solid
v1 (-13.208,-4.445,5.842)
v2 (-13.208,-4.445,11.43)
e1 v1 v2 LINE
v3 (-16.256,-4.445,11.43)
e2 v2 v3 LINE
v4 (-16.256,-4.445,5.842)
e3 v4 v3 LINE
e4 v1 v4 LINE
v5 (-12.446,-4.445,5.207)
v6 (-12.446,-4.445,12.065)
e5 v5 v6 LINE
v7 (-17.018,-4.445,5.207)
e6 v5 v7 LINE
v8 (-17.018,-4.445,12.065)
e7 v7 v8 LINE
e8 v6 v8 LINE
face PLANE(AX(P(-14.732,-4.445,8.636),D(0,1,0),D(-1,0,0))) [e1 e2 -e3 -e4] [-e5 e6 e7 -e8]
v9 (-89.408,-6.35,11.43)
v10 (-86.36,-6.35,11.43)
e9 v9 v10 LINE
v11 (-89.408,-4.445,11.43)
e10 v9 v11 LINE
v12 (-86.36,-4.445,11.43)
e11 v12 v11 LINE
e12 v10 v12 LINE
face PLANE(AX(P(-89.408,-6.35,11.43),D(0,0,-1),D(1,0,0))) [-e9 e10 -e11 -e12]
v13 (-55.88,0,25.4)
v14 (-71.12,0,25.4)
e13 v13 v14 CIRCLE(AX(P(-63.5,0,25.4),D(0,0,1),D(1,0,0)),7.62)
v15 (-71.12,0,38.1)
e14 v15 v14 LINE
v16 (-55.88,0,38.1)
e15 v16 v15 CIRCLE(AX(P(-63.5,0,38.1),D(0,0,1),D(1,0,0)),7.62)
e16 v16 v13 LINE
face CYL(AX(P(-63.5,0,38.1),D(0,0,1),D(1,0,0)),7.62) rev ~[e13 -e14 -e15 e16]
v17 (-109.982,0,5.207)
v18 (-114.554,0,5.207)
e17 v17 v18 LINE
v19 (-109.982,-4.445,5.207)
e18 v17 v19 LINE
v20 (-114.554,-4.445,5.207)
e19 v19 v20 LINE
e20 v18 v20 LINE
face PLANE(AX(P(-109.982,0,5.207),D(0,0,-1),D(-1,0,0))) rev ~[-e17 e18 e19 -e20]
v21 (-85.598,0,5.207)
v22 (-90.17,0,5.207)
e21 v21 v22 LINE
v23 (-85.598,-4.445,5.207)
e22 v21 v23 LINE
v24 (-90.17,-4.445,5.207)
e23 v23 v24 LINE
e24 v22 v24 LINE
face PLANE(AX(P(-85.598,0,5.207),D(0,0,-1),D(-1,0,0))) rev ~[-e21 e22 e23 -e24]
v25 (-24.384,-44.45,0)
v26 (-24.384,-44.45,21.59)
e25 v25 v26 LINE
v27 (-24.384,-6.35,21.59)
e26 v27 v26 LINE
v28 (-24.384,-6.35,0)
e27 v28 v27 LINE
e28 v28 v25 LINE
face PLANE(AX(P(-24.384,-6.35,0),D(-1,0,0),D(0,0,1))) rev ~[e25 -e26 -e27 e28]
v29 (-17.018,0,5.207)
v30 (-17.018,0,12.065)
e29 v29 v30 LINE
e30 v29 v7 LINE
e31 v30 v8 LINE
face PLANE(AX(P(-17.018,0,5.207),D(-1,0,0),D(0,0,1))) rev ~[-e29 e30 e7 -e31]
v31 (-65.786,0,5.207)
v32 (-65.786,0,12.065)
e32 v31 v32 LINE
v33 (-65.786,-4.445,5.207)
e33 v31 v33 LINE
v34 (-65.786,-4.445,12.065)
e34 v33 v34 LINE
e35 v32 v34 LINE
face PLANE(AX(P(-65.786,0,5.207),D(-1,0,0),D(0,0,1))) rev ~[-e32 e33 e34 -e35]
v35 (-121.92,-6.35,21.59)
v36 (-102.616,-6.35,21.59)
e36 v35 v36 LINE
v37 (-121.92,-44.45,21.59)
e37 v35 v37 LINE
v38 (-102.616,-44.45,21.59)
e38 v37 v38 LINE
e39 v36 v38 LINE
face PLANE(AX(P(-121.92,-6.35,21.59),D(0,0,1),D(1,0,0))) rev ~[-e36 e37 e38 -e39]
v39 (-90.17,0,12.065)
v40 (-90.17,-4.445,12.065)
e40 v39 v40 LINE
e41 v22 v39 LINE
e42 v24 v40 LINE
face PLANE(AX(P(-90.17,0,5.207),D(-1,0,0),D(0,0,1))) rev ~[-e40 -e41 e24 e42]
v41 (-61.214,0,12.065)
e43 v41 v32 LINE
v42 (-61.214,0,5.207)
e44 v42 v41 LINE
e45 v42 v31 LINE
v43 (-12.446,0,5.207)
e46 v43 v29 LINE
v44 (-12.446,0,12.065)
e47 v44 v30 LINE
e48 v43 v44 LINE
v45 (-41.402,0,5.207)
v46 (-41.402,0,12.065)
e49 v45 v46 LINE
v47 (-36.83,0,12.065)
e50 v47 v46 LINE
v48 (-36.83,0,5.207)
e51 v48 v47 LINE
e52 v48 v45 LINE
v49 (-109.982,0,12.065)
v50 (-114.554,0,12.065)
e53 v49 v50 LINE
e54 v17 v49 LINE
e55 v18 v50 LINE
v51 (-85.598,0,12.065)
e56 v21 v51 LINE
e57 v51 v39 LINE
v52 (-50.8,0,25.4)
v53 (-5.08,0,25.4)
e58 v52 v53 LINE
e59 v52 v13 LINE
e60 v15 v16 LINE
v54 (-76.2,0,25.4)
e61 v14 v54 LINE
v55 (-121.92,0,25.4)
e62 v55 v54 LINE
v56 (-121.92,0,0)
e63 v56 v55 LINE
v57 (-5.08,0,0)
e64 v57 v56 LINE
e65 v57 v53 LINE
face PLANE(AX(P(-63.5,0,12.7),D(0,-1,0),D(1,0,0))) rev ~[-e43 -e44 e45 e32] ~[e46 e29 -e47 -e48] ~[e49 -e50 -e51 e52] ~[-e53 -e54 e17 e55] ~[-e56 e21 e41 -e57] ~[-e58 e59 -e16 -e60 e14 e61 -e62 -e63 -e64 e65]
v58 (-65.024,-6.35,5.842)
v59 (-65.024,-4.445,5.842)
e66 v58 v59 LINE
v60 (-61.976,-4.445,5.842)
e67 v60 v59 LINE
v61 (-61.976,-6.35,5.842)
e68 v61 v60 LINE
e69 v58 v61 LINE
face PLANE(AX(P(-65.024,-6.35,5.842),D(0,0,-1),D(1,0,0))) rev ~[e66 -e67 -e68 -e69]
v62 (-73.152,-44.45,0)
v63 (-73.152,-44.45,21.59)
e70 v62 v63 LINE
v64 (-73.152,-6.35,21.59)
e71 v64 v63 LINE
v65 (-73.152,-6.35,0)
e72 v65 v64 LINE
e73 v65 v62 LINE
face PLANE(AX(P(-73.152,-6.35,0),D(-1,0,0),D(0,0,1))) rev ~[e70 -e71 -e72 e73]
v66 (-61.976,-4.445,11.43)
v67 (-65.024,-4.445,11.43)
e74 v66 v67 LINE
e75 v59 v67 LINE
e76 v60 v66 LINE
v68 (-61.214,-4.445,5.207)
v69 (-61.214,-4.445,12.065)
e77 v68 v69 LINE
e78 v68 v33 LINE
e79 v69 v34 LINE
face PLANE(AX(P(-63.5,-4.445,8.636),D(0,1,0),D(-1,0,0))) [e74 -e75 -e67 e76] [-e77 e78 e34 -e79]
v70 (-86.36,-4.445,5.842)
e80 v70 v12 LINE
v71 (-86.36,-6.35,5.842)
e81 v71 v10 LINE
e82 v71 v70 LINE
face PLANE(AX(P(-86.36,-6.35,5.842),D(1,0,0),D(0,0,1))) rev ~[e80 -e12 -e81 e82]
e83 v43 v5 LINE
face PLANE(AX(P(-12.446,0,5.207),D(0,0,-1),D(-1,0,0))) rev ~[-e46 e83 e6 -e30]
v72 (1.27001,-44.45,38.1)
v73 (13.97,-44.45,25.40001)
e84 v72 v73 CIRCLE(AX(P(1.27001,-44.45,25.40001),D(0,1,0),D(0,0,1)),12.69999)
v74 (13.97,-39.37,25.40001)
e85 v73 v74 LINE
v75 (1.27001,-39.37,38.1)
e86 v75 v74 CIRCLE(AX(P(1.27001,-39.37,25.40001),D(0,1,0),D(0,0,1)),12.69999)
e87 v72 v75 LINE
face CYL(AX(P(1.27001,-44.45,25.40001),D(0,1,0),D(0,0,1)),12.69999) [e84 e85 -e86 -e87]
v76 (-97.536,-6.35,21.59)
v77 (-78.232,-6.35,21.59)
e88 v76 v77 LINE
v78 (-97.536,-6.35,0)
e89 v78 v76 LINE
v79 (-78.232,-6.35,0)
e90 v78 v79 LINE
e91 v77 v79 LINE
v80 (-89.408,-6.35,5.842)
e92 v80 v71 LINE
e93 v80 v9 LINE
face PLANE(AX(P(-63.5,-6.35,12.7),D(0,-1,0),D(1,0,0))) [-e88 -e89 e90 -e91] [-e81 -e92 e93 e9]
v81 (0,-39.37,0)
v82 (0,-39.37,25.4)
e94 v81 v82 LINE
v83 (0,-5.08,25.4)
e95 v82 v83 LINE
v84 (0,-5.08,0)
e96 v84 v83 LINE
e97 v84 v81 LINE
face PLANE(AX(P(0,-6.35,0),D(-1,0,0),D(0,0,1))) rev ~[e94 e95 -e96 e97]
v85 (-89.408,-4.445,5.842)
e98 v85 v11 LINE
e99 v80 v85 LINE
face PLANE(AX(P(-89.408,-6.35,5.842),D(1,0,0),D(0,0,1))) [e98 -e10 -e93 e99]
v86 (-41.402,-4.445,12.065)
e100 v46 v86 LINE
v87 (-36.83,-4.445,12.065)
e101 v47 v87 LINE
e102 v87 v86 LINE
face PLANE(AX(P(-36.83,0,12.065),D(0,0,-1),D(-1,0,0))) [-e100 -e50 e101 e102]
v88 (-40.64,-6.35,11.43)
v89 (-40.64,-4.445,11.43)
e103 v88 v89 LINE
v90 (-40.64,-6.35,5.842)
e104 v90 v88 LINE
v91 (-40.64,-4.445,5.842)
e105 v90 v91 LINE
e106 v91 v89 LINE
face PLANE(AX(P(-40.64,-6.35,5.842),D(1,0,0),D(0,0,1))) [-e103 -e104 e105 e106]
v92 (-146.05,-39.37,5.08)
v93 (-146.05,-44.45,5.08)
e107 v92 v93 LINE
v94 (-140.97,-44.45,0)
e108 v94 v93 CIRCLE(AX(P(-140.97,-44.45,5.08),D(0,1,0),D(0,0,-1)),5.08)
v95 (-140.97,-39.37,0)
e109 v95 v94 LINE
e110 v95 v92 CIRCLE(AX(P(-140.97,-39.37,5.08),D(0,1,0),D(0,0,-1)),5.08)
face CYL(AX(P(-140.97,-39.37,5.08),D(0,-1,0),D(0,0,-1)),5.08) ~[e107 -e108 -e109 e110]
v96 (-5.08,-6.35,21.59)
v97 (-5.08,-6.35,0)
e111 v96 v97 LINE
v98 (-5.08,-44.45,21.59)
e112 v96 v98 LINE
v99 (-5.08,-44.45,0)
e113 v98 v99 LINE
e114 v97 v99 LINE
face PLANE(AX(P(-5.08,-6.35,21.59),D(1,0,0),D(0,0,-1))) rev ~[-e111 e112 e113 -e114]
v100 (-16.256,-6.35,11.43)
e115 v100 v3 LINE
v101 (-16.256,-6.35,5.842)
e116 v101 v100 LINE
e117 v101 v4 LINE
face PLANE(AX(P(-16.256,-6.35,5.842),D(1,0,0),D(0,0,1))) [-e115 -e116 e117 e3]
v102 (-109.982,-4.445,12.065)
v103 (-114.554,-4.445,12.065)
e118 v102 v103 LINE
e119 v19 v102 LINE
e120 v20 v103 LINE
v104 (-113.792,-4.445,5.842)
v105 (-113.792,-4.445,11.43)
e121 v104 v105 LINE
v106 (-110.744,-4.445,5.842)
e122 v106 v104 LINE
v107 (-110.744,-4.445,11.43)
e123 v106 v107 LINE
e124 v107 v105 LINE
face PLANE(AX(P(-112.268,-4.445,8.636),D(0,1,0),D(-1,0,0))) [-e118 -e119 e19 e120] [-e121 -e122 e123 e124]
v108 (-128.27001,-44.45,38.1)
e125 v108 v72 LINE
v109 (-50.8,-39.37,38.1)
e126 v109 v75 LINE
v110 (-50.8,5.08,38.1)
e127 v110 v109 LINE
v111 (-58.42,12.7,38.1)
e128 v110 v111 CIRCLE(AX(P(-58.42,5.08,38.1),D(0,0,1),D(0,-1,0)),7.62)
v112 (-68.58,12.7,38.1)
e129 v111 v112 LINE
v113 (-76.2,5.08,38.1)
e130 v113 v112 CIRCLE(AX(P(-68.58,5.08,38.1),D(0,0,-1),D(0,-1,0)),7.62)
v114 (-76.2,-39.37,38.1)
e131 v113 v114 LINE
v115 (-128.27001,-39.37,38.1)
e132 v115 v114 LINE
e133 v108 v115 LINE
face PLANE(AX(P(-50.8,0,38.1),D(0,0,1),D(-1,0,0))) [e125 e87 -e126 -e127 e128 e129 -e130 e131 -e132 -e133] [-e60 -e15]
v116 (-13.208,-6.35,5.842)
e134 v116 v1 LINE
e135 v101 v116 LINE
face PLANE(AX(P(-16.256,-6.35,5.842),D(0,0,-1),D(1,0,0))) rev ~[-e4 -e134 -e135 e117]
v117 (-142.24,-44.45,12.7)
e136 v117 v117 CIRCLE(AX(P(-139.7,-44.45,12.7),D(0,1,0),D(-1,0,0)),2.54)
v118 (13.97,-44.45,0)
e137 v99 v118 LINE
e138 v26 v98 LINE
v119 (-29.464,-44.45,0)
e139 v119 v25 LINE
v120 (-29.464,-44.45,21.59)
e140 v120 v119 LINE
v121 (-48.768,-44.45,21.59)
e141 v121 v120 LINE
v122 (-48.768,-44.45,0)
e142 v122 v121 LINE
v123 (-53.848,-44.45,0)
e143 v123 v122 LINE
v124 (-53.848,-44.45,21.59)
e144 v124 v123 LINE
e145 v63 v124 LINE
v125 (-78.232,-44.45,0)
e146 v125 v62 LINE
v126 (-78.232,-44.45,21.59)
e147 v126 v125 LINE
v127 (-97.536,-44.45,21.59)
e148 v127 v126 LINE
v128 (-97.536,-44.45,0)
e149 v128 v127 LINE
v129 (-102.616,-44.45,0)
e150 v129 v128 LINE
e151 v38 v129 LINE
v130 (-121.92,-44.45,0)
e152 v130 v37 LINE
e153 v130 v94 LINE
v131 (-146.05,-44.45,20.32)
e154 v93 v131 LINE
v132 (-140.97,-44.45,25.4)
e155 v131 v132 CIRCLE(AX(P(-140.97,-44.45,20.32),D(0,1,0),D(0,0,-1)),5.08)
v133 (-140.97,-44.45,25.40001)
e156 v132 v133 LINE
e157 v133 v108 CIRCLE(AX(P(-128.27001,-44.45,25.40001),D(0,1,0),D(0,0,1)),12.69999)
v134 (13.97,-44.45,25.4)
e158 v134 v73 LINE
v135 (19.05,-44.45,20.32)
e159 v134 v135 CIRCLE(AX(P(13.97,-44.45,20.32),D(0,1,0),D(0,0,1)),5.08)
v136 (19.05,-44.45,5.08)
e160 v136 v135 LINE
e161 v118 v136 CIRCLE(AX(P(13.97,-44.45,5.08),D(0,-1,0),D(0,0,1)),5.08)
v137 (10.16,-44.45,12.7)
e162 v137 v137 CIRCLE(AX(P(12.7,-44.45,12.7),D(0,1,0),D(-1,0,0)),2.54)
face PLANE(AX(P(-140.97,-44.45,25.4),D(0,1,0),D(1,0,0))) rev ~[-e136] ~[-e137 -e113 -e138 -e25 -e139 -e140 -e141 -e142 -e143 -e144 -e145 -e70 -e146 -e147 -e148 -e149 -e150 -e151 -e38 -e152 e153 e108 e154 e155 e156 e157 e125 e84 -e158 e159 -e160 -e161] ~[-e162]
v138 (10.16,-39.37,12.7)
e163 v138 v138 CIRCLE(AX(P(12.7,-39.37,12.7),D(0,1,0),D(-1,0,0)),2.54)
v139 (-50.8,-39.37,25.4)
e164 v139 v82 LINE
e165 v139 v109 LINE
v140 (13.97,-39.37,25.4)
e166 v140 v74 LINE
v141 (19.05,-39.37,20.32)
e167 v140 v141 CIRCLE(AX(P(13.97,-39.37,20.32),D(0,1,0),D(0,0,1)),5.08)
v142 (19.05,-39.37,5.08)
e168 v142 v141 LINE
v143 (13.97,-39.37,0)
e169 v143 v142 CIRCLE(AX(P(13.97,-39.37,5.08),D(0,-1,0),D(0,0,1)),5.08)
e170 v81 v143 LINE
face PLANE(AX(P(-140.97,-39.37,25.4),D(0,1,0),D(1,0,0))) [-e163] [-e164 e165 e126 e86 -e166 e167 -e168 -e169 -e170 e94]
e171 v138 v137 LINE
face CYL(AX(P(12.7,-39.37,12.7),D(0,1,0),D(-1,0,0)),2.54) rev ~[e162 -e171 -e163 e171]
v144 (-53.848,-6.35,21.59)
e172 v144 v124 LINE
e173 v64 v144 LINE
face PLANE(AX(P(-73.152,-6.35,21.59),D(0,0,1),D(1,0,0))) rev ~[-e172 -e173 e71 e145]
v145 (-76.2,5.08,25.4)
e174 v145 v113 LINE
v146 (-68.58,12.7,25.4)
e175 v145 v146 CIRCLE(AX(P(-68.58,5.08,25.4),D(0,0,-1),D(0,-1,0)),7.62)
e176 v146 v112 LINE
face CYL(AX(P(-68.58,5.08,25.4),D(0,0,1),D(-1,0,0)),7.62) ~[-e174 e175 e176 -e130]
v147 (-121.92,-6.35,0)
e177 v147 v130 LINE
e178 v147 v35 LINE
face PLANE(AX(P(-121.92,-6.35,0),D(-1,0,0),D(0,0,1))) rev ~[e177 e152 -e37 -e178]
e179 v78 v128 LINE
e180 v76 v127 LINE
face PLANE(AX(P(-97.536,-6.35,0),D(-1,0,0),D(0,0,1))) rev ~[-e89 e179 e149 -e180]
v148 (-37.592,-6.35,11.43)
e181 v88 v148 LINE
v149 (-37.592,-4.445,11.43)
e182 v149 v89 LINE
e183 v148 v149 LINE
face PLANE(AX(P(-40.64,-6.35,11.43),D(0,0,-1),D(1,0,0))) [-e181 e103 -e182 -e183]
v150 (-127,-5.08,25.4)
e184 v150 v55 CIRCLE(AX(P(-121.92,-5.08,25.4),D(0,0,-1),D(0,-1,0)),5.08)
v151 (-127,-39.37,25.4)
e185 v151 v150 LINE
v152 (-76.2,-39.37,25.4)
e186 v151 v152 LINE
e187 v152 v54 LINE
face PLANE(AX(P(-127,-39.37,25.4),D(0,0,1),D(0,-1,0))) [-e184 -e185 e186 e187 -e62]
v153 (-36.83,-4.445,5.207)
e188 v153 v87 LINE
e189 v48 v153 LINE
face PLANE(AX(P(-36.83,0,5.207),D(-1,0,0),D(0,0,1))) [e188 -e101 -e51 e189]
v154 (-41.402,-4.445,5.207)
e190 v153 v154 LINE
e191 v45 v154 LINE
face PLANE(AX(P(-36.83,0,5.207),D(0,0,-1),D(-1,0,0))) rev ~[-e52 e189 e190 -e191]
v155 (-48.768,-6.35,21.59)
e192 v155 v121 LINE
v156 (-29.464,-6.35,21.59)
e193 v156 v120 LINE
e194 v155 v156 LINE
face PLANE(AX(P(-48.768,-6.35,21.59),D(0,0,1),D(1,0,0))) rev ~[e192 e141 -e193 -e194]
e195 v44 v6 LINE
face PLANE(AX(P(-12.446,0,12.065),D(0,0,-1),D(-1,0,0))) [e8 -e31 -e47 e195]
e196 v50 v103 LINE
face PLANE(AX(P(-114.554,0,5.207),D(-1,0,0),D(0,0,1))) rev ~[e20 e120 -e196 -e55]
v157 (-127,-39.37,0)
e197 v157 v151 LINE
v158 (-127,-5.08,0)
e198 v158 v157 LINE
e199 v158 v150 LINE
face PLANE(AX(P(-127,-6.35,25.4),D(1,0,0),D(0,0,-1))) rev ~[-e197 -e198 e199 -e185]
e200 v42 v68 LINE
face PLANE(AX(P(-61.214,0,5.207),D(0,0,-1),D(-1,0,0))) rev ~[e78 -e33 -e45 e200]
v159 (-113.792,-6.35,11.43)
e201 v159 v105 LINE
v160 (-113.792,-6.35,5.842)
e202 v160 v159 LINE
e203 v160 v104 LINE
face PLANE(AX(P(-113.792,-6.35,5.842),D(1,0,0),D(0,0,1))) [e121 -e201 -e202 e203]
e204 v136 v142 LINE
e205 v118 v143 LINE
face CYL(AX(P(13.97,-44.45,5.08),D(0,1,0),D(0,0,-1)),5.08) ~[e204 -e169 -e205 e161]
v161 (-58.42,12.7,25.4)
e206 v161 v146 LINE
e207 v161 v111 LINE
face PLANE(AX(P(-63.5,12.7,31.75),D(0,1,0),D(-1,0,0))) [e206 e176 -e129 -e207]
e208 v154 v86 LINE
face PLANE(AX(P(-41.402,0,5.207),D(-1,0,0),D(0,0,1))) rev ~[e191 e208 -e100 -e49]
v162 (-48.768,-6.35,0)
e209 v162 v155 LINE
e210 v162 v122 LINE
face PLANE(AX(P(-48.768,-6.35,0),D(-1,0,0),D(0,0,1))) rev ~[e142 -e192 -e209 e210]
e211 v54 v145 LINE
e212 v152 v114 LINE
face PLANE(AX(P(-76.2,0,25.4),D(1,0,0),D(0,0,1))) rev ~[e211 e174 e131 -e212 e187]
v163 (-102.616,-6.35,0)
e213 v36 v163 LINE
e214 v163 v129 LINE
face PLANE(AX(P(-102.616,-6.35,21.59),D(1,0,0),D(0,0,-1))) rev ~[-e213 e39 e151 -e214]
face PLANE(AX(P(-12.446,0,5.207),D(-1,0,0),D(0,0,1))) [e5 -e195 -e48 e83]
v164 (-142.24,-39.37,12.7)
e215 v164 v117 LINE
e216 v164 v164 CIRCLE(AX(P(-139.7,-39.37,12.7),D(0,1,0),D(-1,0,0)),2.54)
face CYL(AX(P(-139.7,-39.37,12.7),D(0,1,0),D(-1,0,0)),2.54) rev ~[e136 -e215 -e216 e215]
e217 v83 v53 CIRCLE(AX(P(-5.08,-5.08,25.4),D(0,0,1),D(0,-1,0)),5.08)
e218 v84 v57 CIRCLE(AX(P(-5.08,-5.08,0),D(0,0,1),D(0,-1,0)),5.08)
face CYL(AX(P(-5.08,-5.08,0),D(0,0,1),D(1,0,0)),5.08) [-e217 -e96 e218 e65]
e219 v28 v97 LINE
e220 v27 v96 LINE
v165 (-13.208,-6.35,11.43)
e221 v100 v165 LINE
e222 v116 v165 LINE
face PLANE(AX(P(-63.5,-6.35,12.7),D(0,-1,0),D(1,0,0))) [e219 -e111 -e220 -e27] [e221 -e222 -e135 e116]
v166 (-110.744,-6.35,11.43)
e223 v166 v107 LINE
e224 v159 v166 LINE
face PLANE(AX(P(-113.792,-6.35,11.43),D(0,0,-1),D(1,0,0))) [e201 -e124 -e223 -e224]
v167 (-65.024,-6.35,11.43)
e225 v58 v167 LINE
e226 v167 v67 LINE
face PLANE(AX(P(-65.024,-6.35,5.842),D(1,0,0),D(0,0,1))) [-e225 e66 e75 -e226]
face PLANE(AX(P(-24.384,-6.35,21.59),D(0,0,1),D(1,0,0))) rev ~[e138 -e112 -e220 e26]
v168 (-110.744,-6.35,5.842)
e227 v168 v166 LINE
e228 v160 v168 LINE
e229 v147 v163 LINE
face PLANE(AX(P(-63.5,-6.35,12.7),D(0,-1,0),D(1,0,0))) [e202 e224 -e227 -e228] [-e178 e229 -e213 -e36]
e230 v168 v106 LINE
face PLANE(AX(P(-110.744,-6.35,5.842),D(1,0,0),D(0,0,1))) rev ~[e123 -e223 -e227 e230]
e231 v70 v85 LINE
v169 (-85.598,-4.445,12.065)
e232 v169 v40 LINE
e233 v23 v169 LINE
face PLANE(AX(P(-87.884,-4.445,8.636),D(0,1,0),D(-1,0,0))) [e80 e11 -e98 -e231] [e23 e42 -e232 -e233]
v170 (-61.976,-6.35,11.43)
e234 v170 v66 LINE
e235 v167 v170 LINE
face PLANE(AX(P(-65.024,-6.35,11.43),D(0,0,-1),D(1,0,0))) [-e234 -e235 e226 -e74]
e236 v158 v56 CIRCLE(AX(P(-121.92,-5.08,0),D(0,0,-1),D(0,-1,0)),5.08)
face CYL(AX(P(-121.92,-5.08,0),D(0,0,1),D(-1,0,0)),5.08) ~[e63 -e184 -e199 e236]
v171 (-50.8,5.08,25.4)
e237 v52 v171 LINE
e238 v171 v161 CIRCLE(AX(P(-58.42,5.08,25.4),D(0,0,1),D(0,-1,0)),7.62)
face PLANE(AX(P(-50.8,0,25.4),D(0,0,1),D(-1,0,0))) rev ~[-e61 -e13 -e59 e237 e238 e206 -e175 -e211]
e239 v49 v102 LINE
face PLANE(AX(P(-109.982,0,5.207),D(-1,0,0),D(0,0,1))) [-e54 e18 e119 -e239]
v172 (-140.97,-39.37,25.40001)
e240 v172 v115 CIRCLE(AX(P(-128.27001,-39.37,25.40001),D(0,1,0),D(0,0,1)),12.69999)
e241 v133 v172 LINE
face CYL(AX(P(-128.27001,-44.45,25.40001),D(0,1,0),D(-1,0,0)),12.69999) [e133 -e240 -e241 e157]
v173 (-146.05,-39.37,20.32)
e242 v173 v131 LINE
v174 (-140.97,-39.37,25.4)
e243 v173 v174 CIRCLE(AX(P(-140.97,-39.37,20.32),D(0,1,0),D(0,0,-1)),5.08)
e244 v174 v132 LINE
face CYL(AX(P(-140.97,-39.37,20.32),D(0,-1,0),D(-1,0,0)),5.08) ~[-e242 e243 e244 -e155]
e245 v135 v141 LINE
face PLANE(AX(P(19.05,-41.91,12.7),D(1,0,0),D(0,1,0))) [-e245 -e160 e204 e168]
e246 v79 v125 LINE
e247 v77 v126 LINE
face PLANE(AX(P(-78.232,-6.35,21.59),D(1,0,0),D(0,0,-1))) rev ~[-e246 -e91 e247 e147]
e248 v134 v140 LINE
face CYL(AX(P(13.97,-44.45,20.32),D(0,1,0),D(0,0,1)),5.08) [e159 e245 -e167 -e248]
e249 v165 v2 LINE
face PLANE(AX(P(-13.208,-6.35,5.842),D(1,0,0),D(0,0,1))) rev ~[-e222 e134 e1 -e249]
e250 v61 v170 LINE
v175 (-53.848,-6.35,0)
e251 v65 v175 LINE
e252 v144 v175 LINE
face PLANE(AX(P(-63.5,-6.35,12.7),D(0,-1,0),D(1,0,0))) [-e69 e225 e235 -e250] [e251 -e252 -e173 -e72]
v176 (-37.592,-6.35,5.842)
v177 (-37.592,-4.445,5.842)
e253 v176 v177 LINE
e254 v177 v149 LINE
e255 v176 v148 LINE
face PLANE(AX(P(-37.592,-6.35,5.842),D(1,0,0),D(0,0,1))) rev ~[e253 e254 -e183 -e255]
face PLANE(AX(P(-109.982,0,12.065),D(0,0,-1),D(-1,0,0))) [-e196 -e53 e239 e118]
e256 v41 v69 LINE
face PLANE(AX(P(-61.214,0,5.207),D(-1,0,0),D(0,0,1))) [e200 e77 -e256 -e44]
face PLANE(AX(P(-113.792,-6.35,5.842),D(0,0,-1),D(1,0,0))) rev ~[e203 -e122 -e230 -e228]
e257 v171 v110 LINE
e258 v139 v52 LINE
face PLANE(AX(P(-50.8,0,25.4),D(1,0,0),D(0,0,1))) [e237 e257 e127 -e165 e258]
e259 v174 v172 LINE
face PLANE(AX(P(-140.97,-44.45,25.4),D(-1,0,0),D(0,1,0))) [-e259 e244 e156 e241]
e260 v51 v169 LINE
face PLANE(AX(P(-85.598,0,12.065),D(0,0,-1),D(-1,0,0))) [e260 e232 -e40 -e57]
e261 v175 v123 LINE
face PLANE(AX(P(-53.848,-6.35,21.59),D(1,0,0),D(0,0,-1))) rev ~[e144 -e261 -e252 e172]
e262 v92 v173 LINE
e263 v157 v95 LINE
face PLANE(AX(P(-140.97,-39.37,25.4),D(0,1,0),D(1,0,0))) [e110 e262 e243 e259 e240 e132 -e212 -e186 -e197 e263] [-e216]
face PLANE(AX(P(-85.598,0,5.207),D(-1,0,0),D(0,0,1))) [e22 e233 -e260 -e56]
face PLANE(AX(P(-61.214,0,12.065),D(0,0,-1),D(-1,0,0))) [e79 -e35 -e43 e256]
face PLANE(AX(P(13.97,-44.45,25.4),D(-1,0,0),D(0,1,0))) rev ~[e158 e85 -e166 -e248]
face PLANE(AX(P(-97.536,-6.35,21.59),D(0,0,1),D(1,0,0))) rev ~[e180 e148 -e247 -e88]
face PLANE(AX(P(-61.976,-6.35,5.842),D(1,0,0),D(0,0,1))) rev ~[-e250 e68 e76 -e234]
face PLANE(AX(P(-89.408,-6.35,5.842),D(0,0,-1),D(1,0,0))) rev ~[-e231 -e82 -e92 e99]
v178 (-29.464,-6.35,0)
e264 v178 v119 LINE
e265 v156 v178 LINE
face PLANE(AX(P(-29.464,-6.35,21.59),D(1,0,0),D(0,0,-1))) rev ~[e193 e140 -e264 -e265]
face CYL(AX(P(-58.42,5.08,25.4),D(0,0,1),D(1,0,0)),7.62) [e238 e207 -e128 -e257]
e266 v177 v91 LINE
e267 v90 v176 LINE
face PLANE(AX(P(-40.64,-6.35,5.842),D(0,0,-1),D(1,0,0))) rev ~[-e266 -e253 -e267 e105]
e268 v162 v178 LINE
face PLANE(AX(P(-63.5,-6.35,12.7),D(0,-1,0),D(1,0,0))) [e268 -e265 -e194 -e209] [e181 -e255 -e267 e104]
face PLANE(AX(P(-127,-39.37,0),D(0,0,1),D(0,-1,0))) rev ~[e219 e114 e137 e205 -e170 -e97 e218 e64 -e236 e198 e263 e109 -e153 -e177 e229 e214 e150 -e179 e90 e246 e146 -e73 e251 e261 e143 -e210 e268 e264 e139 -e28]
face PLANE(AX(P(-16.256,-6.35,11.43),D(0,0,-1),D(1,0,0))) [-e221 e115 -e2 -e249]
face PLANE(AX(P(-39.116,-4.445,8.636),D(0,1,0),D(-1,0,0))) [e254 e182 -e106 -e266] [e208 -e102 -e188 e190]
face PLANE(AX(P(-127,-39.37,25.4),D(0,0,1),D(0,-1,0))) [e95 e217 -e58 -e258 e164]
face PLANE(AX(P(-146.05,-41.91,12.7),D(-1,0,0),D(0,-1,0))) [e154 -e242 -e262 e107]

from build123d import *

# Parameters (mm, degrees)
F0_W      = 127
F0_H      = 25.4
F1_DEPTH  = 6.35
F2_W      = 19.304
F2_H      = 3.81
F3_DEPTH  = 38.1
F4_W      = 3.048
F4_H      = 5.588
F5_DEPTH  = 6.351
F6_W      = 3.048
F6_H      = 5.588
F7_DEPTH  = 6.351
F8_W      = 4.572
F8_H      = 6.858
F8_W_2    = 3.048
F8_H_2    = 5.588
F9_DEPTH  = 4.445
F10_W     = 5.08
F10_H     = 25.4
F11_DEPTH = 19.05
F12_W     = 5.08
F12_H     = 25.4
F13_DEPTH = 19.05
F14_R     = 2.54
F15_DEPTH = 5.081
F16_R     = 5.08
F17_W     = 154.94
F17_H     = 5.08
F18_DEPTH = 12.7
F19_R     = 12.69999
F20_W     = 25.4
F20_H     = 39.37
F21_DEPTH = 12.7
F22_W     = 25.4
F22_H     = 12.7
F23_DEPTH = 12.7
F25_DEPTH = 38.101
F26_R     = 7.62


# Not quite as in the source:
# - a fillet or chamfer is up to 0.001 mm smaller than in the source, because OpenCascade refuses the exact size


with BuildPart() as f1:
    # F0 (on Front) → F1 (new body)
    with BuildSketch(Plane.XZ):
        with Locations((-63.5, 12.7)):
            Rectangle(F0_W, F0_H)
    extrude(amount=F1_DEPTH)

    # F2 (on face) → F3 (join)
    with BuildSketch(Plane.XZ.offset(6.35)):
        Polygon((-121.92, 25.4), (-127, 25.4), (-127, 0), (-121.92, 0), (-121.92, 21.59), align=None)
        with Locations((-112.268, 23.495)):
            Rectangle(F2_W, F2_H)
        Polygon((-97.536, 25.4), (-102.616, 25.4), (-102.616, 21.59), (-102.616, 0), (-97.536, 0), (-97.536, 21.59), align=None)
        with Locations((-87.884, 23.495)):
            Rectangle(F2_W, F2_H)
        Polygon((-73.152, 25.4), (-78.232, 25.4), (-78.232, 21.59), (-78.232, 0), (-73.152, 0), (-73.152, 21.59), align=None)
        with Locations((-63.5, 23.495)):
            Rectangle(F2_W, F2_H)
        Polygon((-48.768, 25.4), (-53.848, 25.4), (-53.848, 21.59), (-53.848, 0), (-48.768, 0), (-48.768, 21.59), align=None)
        with Locations((-39.116, 23.495)):
            Rectangle(F2_W, F2_H)
        Polygon((-24.384, 25.4), (-29.464, 25.4), (-29.464, 21.59), (-29.464, 0), (-24.384, 0), (-24.384, 21.59), align=None)
        with Locations((-14.732, 23.495)):
            Rectangle(F2_W, F2_H)
        Polygon((0, 25.4), (-5.08, 25.4), (-5.08, 21.59), (-5.08, 0), (0, 0), align=None)
    extrude(amount=F3_DEPTH)

    # F4 (on face) → F5 (cut, through all)
    with BuildSketch(Plane.XZ.offset(6.35)):
        with Locations((-14.732, 8.636)):
            Rectangle(F4_W, F4_H)
    extrude(amount=-F5_DEPTH, mode=Mode.SUBTRACT)

    # F6 (on face) → F7 (cut, through all)
    with BuildSketch(Plane.XZ.offset(6.35)):
        with Locations((-39.116, 8.636)):
            Rectangle(F6_W, F6_H)
        with Locations((-63.5, 8.636)):
            Rectangle(F6_W, F6_H)
        with Locations((-87.884, 8.636)):
            Rectangle(F6_W, F6_H)
        with Locations((-112.268, 8.636)):
            Rectangle(F6_W, F6_H)
    extrude(amount=-F7_DEPTH, mode=Mode.SUBTRACT)

    # F8 (on face) → F9 (cut)
    with BuildSketch(Plane(origin=(0, 0, 0), x_dir=(-1, 0, 0), z_dir=(0, 1, 0))):
        with Locations((14.732, 8.636)):
            Rectangle(F8_W, F8_H)
        with Locations((14.732, 8.636)):
            Rectangle(F8_W_2, F8_H_2, mode=Mode.SUBTRACT)
        with Locations((112.268, 8.636)):
            Rectangle(F8_W, F8_H)
        with Locations((112.268, 8.636)):
            Rectangle(F8_W_2, F8_H_2, mode=Mode.SUBTRACT)
        with Locations((87.884, 8.636)):
            Rectangle(F8_W, F8_H)
        with Locations((87.884, 8.636)):
            Rectangle(F8_W_2, F8_H_2, mode=Mode.SUBTRACT)
        with Locations((63.5, 8.636)):
            Rectangle(F8_W, F8_H)
        with Locations((63.5, 8.636)):
            Rectangle(F8_W_2, F8_H_2, mode=Mode.SUBTRACT)
        with Locations((39.116, 8.636)):
            Rectangle(F8_W, F8_H)
        with Locations((39.116, 8.636)):
            Rectangle(F8_W_2, F8_H_2, mode=Mode.SUBTRACT)
    extrude(amount=-F9_DEPTH, mode=Mode.SUBTRACT)

    # F10 (on face) → F11 (join)
    with BuildSketch(Plane.YZ):
        with Locations((-41.91, 12.7)):
            Rectangle(F10_W, F10_H)
    extrude(amount=F11_DEPTH)

    # F12 (on face) → F13 (join)
    with BuildSketch(Plane(origin=(-127, 0, 0), x_dir=(0, -1, 0), z_dir=(-1, 0, 0))):
        with Locations((41.91, 12.7)):
            Rectangle(F12_W, F12_H)
    extrude(amount=F13_DEPTH)

    # F14 (on face) → F15 (cut, through all)
    with BuildSketch(Plane(origin=(0, -39.37, 0), x_dir=(-1, 0, 0), z_dir=(0, 1, 0))):
        with Locations((-12.7, 12.7)):
            Circle(F14_R)
        with Locations((139.7, 12.7)):
            Circle(F14_R)
    extrude(amount=-F15_DEPTH, mode=Mode.SUBTRACT)

    # F16
    f16_edges = [f1.edges().sort_by_distance(p)[0] for p in [
        (19.05, -41.91, 0),
        (19.05, -41.91, 25.4),
        (-146.05, -41.91, 0),
        (-146.05, -41.91, 25.4),
        (-127, 0, 12.7),
        (0, 0, 12.7),
    ]]
    fillet(f16_edges, radius=F16_R)

    # F17 (on face) → F18 (join)
    with BuildSketch(Plane.XY.offset(25.4)):
        with Locations((-63.5, -41.91)):
            Rectangle(F17_W, F17_H)
    extrude(amount=F18_DEPTH)

    # F19 (radius 12.7 in the source; OpenCascade refuses exactly that, so slightly less here)
    f19_edges = [f1.edges().sort_by_distance(p)[0] for p in [
        (13.97, -41.91, 38.1),
        (-140.97, -41.91, 38.1),
    ]]
    fillet(f19_edges, radius=F19_R)

    # F20 (on face) → F21 (join)
    with BuildSketch(Plane.XY.offset(25.4)):
        with Locations((-63.5, -19.685)):
            Rectangle(F20_W, F20_H)
    extrude(amount=F21_DEPTH)

    # F22 (on face) → F23 (join)
    with BuildSketch(Plane(origin=(0, 0, 0), x_dir=(-1, 0, 0), z_dir=(0, 1, 0))):
        with Locations((63.5, 31.75)):
            Rectangle(F22_W, F22_H)
    extrude(amount=F23_DEPTH)

    # F24 (on face) → F25 (cut, through all)
    with BuildSketch(Plane.XY.offset(38.1)):
        with BuildLine():
            ThreePointArc((-55.88, 0), (-63.5, 7.62), (-71.12, 0))
            Line((-71.12, 0), (-55.88, 0))
        make_face()
    extrude(amount=-F25_DEPTH, mode=Mode.SUBTRACT)

    # F26
    f26_edges = [f1.edges().sort_by_distance(p)[0] for p in [
        (-50.8, 12.7, 31.75),
        (-76.2, 12.7, 31.75),
    ]]
    fillet(f26_edges, radius=F26_R)


solid = f1.part
